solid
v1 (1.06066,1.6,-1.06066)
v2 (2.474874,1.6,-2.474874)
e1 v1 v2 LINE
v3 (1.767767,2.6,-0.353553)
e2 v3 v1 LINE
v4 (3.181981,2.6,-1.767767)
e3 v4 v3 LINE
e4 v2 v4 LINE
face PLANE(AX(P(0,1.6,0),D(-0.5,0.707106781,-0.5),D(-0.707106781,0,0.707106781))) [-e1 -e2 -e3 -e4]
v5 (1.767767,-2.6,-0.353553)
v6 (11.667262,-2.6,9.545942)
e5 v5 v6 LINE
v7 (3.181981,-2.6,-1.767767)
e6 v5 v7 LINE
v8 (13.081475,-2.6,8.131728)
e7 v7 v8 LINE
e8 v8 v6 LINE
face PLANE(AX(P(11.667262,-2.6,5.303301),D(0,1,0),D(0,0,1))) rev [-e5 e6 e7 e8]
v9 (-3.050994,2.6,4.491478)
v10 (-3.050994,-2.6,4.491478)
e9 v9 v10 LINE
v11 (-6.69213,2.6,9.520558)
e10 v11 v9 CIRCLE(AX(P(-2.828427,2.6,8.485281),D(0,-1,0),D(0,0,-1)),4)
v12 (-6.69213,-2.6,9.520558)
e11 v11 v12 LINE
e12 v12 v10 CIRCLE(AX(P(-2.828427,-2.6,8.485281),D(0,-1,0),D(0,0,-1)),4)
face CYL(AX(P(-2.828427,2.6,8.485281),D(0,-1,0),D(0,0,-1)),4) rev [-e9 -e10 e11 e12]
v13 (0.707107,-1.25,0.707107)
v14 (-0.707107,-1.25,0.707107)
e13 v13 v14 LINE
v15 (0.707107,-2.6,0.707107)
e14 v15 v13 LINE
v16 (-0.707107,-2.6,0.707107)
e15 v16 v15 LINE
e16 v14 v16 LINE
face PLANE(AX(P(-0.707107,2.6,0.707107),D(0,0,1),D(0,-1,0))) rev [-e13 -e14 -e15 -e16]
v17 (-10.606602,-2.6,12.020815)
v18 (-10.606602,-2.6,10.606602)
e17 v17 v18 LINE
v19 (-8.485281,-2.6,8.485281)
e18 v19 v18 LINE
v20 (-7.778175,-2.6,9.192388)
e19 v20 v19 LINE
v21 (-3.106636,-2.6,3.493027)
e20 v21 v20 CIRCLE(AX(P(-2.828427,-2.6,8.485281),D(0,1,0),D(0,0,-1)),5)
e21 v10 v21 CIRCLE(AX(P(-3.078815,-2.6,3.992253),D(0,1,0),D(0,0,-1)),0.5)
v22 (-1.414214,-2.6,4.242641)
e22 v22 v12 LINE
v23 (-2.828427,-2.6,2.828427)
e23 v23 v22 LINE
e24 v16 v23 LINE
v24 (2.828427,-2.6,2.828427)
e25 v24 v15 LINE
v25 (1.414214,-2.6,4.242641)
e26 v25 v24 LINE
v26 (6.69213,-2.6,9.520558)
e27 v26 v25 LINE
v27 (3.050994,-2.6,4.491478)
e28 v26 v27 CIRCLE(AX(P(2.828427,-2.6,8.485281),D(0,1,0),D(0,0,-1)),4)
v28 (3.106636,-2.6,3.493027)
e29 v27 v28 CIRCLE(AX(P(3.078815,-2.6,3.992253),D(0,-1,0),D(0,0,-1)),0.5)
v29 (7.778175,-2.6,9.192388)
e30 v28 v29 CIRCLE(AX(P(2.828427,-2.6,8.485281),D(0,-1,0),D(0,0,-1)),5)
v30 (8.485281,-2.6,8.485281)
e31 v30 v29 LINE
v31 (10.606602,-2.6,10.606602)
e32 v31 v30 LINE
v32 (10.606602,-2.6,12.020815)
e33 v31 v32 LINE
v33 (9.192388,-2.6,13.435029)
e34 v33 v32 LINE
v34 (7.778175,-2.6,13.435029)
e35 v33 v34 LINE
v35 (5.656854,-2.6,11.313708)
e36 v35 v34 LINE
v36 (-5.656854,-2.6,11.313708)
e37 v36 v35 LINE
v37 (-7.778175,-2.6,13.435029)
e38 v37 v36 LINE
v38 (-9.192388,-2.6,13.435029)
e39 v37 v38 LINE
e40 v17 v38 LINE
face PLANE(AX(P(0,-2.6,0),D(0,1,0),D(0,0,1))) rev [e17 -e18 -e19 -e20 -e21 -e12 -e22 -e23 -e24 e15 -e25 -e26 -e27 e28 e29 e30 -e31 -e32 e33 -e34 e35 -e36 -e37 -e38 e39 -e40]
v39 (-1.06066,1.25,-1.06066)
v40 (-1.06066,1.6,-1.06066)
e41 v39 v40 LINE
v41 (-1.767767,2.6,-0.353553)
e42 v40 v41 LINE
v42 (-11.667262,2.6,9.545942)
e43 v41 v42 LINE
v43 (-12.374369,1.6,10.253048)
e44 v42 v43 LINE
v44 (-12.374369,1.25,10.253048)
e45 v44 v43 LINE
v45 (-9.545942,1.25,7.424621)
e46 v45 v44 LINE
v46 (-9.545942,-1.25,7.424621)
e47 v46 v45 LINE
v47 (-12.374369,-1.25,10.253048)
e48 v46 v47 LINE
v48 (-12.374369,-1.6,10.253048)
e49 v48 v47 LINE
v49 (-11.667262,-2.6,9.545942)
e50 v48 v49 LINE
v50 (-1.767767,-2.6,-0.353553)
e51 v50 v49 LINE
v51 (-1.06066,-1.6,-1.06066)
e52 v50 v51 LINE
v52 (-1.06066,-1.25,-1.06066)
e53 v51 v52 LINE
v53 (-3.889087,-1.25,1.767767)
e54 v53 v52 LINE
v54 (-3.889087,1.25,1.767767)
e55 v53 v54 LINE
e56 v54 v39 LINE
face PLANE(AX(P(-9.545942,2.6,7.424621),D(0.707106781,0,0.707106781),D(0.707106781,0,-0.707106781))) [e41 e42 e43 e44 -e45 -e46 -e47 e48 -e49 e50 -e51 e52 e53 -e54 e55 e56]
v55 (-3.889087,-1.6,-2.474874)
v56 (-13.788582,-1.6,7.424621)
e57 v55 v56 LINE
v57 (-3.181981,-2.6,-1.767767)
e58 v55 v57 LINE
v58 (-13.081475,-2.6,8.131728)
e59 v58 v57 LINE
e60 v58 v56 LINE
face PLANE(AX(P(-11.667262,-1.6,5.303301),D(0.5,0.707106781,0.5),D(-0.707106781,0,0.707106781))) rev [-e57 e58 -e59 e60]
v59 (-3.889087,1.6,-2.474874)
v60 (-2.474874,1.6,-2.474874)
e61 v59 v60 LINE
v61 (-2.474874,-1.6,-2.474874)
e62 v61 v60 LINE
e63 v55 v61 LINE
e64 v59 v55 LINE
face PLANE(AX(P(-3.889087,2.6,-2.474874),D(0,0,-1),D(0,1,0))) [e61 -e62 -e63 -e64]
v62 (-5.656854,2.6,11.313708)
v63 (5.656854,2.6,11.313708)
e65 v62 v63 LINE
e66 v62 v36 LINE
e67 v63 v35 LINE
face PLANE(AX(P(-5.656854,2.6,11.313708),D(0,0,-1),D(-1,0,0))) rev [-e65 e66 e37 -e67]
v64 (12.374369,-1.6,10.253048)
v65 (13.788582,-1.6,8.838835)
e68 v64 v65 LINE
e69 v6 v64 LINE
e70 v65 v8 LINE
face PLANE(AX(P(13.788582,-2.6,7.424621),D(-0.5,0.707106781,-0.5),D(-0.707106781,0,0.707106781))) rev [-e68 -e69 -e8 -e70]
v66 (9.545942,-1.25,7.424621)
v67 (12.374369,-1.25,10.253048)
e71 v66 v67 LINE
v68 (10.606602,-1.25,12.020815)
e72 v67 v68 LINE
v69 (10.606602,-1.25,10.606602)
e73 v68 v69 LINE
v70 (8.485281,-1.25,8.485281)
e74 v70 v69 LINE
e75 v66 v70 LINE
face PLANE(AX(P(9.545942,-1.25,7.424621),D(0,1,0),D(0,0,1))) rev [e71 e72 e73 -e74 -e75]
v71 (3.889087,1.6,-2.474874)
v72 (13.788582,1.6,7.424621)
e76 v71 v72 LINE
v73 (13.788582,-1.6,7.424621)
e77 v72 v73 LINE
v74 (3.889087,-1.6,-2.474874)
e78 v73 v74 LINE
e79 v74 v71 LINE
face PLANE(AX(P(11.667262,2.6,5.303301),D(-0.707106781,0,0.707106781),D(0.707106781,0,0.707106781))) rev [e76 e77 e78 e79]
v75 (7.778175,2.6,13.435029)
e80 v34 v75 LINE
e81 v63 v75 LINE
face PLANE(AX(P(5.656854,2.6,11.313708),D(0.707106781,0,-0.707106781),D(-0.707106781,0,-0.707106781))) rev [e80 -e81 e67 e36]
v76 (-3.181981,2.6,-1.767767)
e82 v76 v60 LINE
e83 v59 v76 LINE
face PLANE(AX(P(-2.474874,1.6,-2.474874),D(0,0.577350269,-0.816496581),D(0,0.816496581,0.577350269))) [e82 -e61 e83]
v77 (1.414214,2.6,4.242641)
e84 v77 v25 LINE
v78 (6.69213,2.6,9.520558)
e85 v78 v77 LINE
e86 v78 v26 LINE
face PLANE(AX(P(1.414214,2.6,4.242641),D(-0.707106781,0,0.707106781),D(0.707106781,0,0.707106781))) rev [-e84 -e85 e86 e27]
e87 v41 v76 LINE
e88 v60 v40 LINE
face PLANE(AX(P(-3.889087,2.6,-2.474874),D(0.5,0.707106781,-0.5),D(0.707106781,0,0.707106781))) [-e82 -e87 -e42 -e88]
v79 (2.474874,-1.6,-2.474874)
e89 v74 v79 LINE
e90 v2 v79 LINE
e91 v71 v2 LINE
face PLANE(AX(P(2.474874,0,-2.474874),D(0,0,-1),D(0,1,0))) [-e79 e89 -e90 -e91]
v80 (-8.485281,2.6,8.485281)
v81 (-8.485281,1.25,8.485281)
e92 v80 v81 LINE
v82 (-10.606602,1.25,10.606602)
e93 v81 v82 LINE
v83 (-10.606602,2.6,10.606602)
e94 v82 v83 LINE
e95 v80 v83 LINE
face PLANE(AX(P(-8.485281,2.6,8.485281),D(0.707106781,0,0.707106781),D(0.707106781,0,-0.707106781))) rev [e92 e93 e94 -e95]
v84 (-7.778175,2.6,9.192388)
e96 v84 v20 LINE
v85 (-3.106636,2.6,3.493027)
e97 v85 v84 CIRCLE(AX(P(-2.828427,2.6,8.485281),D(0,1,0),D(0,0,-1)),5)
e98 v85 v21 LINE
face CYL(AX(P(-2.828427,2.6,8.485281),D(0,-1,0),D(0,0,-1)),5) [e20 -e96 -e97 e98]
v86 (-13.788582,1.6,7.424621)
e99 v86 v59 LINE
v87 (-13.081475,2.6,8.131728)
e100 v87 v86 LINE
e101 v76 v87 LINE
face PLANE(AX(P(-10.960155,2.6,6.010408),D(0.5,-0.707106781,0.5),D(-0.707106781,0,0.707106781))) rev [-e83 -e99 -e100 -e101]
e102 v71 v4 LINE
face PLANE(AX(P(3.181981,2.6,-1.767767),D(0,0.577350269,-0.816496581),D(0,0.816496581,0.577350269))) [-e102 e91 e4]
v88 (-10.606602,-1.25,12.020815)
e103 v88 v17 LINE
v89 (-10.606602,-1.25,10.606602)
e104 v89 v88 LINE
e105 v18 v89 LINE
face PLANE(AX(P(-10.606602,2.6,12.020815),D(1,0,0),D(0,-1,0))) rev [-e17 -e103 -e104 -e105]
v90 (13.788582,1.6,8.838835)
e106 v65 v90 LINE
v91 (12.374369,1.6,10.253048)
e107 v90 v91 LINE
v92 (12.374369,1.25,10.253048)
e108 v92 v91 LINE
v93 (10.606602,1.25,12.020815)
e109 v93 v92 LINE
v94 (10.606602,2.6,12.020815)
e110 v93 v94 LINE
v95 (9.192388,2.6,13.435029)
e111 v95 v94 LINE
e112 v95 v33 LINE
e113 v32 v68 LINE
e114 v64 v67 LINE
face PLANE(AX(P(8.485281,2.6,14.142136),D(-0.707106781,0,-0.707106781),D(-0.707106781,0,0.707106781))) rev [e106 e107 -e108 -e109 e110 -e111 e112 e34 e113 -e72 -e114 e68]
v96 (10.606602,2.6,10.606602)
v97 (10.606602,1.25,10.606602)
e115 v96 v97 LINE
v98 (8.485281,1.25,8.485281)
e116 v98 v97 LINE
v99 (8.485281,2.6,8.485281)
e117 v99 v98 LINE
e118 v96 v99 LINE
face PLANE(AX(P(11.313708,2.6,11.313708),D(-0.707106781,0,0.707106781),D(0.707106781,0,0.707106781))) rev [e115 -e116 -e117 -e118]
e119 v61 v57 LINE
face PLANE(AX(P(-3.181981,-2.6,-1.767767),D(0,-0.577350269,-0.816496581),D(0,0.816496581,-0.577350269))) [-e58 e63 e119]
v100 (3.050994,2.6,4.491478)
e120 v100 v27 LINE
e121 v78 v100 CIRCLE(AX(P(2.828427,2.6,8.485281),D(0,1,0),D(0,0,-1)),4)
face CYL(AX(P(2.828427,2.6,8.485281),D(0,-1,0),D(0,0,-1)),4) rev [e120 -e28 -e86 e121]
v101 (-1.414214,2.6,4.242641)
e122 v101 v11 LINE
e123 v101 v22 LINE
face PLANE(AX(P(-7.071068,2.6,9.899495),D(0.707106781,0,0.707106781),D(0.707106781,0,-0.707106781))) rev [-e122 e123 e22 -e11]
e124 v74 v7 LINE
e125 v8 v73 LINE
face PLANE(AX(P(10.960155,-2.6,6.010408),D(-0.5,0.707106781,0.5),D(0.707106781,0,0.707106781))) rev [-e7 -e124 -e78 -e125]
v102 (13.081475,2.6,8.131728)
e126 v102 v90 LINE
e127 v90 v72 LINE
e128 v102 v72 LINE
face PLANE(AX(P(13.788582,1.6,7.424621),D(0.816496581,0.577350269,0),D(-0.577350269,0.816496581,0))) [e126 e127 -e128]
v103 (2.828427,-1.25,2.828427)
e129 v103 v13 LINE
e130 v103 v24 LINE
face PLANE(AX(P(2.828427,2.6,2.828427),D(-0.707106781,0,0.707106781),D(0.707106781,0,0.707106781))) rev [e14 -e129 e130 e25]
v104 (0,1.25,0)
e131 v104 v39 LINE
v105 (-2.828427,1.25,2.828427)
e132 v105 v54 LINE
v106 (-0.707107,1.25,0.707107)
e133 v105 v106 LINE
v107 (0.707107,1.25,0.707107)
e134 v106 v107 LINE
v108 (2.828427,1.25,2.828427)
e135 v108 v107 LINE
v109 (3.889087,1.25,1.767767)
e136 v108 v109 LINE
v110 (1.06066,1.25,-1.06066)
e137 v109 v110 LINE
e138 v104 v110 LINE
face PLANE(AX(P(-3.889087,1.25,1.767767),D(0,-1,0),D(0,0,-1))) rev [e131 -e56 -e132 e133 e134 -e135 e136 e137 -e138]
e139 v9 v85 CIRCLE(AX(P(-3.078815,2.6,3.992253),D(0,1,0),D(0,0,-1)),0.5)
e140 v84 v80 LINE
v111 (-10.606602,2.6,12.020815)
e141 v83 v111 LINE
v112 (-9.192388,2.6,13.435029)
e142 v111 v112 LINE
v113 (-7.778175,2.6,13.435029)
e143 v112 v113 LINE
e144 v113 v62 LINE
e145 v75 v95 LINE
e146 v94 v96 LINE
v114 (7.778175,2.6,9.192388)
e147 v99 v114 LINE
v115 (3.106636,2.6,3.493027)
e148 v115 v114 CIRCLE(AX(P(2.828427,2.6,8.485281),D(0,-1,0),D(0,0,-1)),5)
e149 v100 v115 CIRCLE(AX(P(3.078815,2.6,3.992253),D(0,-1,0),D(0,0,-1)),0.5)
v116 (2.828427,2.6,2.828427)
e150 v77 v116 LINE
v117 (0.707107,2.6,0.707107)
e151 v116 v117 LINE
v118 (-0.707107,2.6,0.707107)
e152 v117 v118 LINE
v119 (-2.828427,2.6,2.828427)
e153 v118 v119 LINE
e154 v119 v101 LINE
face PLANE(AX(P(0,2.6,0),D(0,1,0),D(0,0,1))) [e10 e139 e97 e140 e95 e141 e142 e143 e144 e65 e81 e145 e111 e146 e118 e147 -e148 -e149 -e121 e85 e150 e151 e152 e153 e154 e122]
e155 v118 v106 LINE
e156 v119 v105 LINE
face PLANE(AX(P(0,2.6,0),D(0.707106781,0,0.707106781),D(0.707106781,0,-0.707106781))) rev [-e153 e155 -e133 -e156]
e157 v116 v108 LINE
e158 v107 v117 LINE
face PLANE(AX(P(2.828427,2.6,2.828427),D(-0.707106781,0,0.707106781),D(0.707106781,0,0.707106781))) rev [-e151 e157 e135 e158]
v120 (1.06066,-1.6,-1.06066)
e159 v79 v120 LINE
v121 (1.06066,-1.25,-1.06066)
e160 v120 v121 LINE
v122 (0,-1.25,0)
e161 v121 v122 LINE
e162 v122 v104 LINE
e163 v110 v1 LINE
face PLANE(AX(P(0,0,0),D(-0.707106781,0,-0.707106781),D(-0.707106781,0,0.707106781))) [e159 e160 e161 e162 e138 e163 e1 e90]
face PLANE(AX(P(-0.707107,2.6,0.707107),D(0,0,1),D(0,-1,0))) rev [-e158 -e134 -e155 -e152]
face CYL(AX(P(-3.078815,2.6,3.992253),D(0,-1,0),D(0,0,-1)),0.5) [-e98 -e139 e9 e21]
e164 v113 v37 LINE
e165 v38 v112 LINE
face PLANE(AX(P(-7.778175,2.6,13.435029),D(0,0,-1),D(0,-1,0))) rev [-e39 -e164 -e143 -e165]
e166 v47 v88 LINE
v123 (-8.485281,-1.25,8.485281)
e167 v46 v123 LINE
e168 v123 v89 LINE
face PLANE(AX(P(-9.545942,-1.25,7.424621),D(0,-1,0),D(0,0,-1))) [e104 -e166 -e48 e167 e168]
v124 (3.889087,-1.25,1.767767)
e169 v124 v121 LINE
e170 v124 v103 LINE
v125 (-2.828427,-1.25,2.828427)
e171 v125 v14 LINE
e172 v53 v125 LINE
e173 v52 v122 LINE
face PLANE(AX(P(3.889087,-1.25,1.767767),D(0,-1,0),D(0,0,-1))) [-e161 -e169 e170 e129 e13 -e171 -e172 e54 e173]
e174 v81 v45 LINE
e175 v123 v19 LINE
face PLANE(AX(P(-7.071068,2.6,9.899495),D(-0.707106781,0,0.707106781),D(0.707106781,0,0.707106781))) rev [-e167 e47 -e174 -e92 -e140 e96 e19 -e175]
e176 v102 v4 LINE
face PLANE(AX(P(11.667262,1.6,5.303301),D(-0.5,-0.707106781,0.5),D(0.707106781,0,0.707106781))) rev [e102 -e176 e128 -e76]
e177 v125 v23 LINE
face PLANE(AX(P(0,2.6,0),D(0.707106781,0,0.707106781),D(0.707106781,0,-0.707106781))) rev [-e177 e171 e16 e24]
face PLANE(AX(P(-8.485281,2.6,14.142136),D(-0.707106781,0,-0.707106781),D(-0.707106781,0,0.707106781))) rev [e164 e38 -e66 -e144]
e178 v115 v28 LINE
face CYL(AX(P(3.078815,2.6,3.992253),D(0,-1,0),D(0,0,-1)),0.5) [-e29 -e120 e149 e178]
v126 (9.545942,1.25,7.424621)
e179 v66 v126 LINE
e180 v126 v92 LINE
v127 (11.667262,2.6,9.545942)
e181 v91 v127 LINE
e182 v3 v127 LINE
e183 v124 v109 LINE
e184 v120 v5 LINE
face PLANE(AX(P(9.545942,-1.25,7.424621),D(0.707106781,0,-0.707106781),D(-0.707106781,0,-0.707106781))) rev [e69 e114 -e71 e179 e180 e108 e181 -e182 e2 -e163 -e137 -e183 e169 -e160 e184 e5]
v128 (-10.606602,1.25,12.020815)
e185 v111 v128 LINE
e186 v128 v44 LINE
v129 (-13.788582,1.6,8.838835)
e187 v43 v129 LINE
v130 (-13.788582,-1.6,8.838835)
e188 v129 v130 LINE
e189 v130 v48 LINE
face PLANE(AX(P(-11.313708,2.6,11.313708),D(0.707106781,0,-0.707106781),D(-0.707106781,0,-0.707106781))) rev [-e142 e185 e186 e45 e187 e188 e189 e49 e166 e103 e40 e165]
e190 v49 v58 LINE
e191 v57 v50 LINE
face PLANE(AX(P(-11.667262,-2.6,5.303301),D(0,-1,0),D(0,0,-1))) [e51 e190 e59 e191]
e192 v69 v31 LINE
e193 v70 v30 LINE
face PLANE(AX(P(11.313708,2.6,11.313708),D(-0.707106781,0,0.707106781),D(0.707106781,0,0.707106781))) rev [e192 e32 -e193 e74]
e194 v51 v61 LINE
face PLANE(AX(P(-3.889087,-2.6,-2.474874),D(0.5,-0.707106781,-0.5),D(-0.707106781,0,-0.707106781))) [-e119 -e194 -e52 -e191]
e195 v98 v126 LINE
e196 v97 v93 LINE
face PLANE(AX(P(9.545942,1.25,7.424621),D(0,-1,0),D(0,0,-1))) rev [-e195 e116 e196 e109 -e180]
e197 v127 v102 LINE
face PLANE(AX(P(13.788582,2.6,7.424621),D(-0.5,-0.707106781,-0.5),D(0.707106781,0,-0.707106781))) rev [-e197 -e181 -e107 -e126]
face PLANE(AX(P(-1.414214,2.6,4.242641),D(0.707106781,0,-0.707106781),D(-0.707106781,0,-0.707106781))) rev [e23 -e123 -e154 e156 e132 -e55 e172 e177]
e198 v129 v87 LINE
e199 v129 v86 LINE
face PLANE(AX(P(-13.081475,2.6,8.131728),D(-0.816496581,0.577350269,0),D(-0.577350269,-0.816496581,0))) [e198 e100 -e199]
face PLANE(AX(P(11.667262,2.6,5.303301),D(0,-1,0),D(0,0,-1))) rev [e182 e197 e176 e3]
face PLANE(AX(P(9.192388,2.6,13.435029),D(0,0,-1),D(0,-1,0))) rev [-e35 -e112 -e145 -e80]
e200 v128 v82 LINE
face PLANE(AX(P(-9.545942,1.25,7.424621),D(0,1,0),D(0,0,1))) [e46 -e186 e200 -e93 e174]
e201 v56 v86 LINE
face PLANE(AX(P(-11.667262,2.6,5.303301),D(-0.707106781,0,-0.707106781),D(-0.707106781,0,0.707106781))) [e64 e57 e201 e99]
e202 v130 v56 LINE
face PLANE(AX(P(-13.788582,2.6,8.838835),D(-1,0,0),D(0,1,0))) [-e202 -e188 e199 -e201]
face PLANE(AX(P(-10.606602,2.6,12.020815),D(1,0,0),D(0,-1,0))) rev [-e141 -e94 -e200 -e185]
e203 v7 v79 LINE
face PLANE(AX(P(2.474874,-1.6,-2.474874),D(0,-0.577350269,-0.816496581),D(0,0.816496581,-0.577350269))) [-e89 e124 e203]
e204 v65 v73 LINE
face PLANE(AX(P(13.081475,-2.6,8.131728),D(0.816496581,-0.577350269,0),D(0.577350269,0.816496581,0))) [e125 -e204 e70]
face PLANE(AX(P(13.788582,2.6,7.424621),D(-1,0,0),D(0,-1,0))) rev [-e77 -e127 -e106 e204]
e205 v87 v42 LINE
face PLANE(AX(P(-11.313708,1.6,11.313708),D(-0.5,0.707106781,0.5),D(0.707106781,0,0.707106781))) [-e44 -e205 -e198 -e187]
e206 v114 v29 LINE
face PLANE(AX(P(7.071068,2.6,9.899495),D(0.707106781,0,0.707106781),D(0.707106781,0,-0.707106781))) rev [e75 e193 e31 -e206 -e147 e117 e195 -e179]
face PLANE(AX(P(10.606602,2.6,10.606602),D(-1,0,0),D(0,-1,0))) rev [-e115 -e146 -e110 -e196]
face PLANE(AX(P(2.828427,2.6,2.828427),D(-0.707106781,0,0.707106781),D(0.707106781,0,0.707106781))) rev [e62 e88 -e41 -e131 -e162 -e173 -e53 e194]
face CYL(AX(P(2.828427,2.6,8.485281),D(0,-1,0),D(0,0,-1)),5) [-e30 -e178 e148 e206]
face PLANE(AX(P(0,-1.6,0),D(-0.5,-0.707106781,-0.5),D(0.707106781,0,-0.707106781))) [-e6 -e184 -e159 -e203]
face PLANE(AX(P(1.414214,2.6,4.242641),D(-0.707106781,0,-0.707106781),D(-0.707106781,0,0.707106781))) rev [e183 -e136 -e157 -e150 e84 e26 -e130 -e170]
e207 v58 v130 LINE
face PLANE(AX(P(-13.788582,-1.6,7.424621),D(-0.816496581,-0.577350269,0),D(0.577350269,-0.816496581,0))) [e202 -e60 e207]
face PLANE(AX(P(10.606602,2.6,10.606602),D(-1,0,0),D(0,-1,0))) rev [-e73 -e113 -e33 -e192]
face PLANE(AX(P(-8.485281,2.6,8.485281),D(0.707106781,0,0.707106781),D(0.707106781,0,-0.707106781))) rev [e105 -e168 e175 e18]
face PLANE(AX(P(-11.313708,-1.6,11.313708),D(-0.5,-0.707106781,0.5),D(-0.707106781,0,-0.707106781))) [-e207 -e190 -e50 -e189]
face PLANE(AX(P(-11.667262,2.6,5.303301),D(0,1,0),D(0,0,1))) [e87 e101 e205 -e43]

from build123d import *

# Parameters (mm, degrees)
BOSS_EXTRUDE1_DEPTH      = 2.6
BOSS_EXTRUDE2_DEPTH      = 4
SKETCH3_W                = 3
SKETCH3_H                = 5.2
BOSS_EXTRUDE3_DEPTH      = 8
BOSS_EXTRUDE4_DEPTH      = 2.6
CHAMFER1_SIZE            = 1
MIRROR2_COPY_1_DEPTH     = 4
CHAMFER1_OF_MIRROR2_SIZE = 1
CHAMFER2_SIZE            = 1


with BuildPart() as part:
    # Sketch1 → Boss-Extrude1 (new, symmetric)
    with BuildSketch(Plane(origin=(0, 0, 0), x_dir=(1, 0, 0), z_dir=(0, 1, 0))):
        Polygon((0, 0), (-2.828427125, -2.828427125), (-1.414213562, -4.242640687), (-7.071067812, -9.899494937), (-8.485281374, -8.485281374), (-11.313708499, -11.313708499), (-8.485281374, -14.142135624), (-5.656854249, -11.313708499), (5.656854249, -11.313708499), (8.485281374, -14.142135624), (11.313708499, -11.313708499), (8.485281374, -8.485281374), (7.071067812, -9.899494937), (1.414213562, -4.242640687), (2.828427125, -2.828427125), align=None)
    extrude(amount=BOSS_EXTRUDE1_DEPTH, both=True)

    # Sketch2 → Boss-Extrude2 (add)
    with BuildSketch(Plane(origin=(-11.313708499, 0, 11.313708499), x_dir=(0.7071067811865501, 0, 0.7071067811865449), z_dir=(-0.7071067811865449, 0, 0.7071067811865501))):
        Polygon((-1.5, -1.25), (-1.5, -2.6), (-4.5, -2.6), (-4.5, 2.6), (-1.5, 2.6), (-1.5, 1.25), (0, 1.25), (0, -1.25), align=None)
    boss_extrude2 = extrude(amount=-BOSS_EXTRUDE2_DEPTH)

    # Mirror1: Boss-Extrude2 across plane
    add(boss_extrude2.mirror(Plane(origin=(-5.656854249, 0, 5.656854249), x_dir=(0.707106781186549, 0, 0.707106781186546), z_dir=(-0.707106781186546, 0, 0.707106781186549))))

    # Sketch3 → Boss-Extrude3 (add)
    with BuildSketch(Plane(origin=(-2.828427125, 0, 2.828427125), x_dir=(0.7071067811865493, 0, 0.7071067811865457), z_dir=(-0.7071067811865457, 0, 0.7071067811865493))):
        with Locations((-3, 0)):
            Rectangle(SKETCH3_W, SKETCH3_H)
    boss_extrude3 = extrude(amount=BOSS_EXTRUDE3_DEPTH)

    # Sketch4 → Boss-Extrude4 (add, symmetric)
    with BuildSketch(Plane(origin=(0, 0, 0), x_dir=(1, 0, 0), z_dir=(0, 1, 0))):
        with BuildLine():
            Line((-7.778174593, -9.192388155), (-7.071067812, -9.899494937))
            Line((-7.071067812, -9.899494937), (-6.69213043, -9.520557555))
            ThreePointArc((-6.69213043, -9.520557555), (-6.068382545, -6.139500295), (-3.050994148, -4.491478184))
            ThreePointArc((-3.050994148, -4.491478184), (-2.579589628, -3.964431908), (-3.106635904, -3.493027387))
            ThreePointArc((-3.106635904, -3.493027387), (-6.695410435, -5.315669399), (-7.778174593, -9.192388155))
        make_face()
    boss_extrude4 = extrude(amount=BOSS_EXTRUDE4_DEPTH, both=True)

    # Chamfer1
    chamfer1_edges = [part.edges().sort_by_distance(p)[0] for p in [
        (-8.838834765, -2.6, 2.474873734),
        (-8.838834765, 2.6, 2.474873734),
        (-14.495689014, 0, 8.131727984),
        (-13.435028843, -2.6, 9.192388155),
        (-13.435028843, 2.6, 9.192388155),
        (-3.181980515, 0, -3.181980515),
        (-2.121320344, -2.6, -2.121320344),
        (-2.121320344, 2.6, -2.121320344),
    ]]
    chamfer(chamfer1_edges, length=CHAMFER1_SIZE)

    # Mirror2: Boss-Extrude2, Boss-Extrude3, Boss-Extrude4 across plane
    add(boss_extrude2.mirror(Plane(origin=(0, 0, 0), x_dir=(0, 0, 1), z_dir=(1, 0, 0))))
    add(boss_extrude3.mirror(Plane(origin=(0, 0, 0), x_dir=(0, 0, 1), z_dir=(1, 0, 0))))
    add(boss_extrude4.mirror(Plane(origin=(0, 0, 0), x_dir=(0, 0, 1), z_dir=(1, 0, 0))))

    # Mirror2 copy 1 sketch → Mirror2 copy 1 (add)
    with BuildSketch(Plane(origin=(0, 0, 0), x_dir=(-0.7071067811865479, 0, 0.7071067811865471), z_dir=(-0.7071067811865471, 0, -0.7071067811865479))):
        Polygon((-1.5, -1.25), (-1.5, -2.6), (-4.5, -2.6), (-4.5, 2.6), (-1.5, 2.6), (-1.5, 1.25), (0, 1.25), (0, -1.25), align=None)
    extrude(amount=-MIRROR2_COPY_1_DEPTH)

    # Chamfer1 of Mirror2
    chamfer1_of_mirror2_edges = [part.edges().sort_by_distance(p)[0] for p in [
        (8.838834765, -2.6, 2.474873734),
        (8.838834765, 2.6, 2.474873734),
        (14.495689014, 0, 8.131727984),
        (13.435028843, -2.6, 9.192388155),
        (13.435028843, 2.6, 9.192388155),
        (3.181980515, 0, -3.181980515),
        (2.121320344, -2.6, -2.121320344),
        (2.121320344, 2.6, -2.121320344),
    ]]
    chamfer(chamfer1_of_mirror2_edges, length=CHAMFER1_OF_MIRROR2_SIZE)

    # Chamfer2
    # the kernel refuses this chamfer: 1 mm, written as the material it takes off along each edge
    with BuildSketch(Plane(origin=(11.313708499, -5.171682988, 11.313708499), x_dir=(-0.6873969152646685, 0, 0.7262819568766788), z_dir=(0, 1, 0)), Plane(origin=(11.313708499, 1.25, 11.313708499), x_dir=(-0.6873969152646685, 0, 0.7262819568766788), z_dir=(0, 1, 0)), Plane(origin=(0, 5.171682988, 0), x_dir=(-0.7262819568766743, 0, 0.6873969152646733), z_dir=(0, -1, 0)), Plane(origin=(-11.313708499, -5.171682988, 11.313708499), x_dir=(0.6873969152646597, 0, -0.7262819568766873), z_dir=(0, 1, 0)), Plane(origin=(0, -1.25, 0), x_dir=(-0.7262819568766743, 0, 0.6873969152646733), z_dir=(0, -1, 0))) as chamfer2_piece_1:
        Polygon((CHAMFER2_SIZE * 0.999621916911, -CHAMFER2_SIZE * 0.0274958766106), (-CHAMFER2_SIZE * 0.0274958766106, -CHAMFER2_SIZE * 0.999621916911), (0, 0), align=None)
    extrude(amount=3.921682988, mode=Mode.SUBTRACT)
    with BuildSketch(Plane(origin=(11.313708499, -5.171682988, 11.313708499), x_dir=(-0.6873969152646685, 0, 0.7262819568766788), z_dir=(0, 1, 0))) as chamfer2_piece_2_section:
        Polygon((CHAMFER2_SIZE * 0.999621916911, -CHAMFER2_SIZE * 0.0274958766106), (-CHAMFER2_SIZE * 0.0274958766106, -CHAMFER2_SIZE * 0.999621916911), (0, 0), align=None)
    chamfer2_piece_2 = extrude(amount=6.493365976, mode=Mode.PRIVATE)
    chamfer2_piece_2 = split(chamfer2_piece_2, bisect_by=Plane(origin=(10.847309879, 1.25, 11.313708499), z_dir=(0, 1, 0)), keep=Keep.TOP, mode=Mode.PRIVATE)
    add(chamfer2_piece_2, mode=Mode.SUBTRACT)
    with BuildSketch(Plane(origin=(11.313708499, -1.321682988, 11.313708499), x_dir=(-0.6873969152646685, 0, 0.7262819568766788), z_dir=(0, 1, 0))) as chamfer2_piece_3_section:
        Polygon((CHAMFER2_SIZE * 0.999621916911, -CHAMFER2_SIZE * 0.0274958766106), (-CHAMFER2_SIZE * 0.0274958766106, -CHAMFER2_SIZE * 0.999621916911), (0, 0), align=None)
    chamfer2_piece_3 = extrude(amount=6.493365976, mode=Mode.PRIVATE)
    chamfer2_piece_3 = split(chamfer2_piece_3, bisect_by=Plane(origin=(10.847309879, -1.25, 11.313708499), z_dir=(0, -1, 0)), keep=Keep.TOP, mode=Mode.PRIVATE)
    add(chamfer2_piece_3, mode=Mode.SUBTRACT)
    with BuildSketch(Plane(origin=(8.485281374, -5.171682988, 14.142135624), x_dir=(0.7262819568766956, 0, -0.6873969152646507), z_dir=(0, 1, 0))) as chamfer2_piece_4:
        Polygon((CHAMFER2_SIZE * 0.999621916911, CHAMFER2_SIZE * 0.0274958766106), (-CHAMFER2_SIZE * 0.0274958766106, CHAMFER2_SIZE * 0.999621916911), (0, 0), align=None)
    extrude(amount=10.343365976, mode=Mode.SUBTRACT)
    with BuildSketch(Plane(origin=(-8.485281374, -5.171682988, 14.142135624), x_dir=(-0.7262819568766898, 0, -0.687396915264657), z_dir=(0, 1, 0))) as chamfer2_piece_5:
        Polygon((CHAMFER2_SIZE * 0.999621916911, -CHAMFER2_SIZE * 0.0274958766106), (-CHAMFER2_SIZE * 0.0274958766106, -CHAMFER2_SIZE * 0.999621916911), (0, 0), align=None)
    extrude(amount=10.343365976, mode=Mode.SUBTRACT)
    with BuildSketch(Plane(origin=(-11.313708499, -1.321682988, 11.313708499), x_dir=(0.6873969152646623, 0, 0.7262819568766848), z_dir=(0, 1, 0))) as chamfer2_piece_6_section:
        Polygon((CHAMFER2_SIZE * 0.999621916911, CHAMFER2_SIZE * 0.0274958766106), (-CHAMFER2_SIZE * 0.0274958766106, CHAMFER2_SIZE * 0.999621916911), (0, 0), align=None)
    chamfer2_piece_6 = extrude(amount=6.493365976, mode=Mode.PRIVATE)
    chamfer2_piece_6 = split(chamfer2_piece_6, bisect_by=Plane(origin=(-10.847309879, -1.25, 11.313708499), z_dir=(0, -1, 0)), keep=Keep.TOP, mode=Mode.PRIVATE)
    add(chamfer2_piece_6, mode=Mode.SUBTRACT)
    with BuildSketch(Plane(origin=(-11.313708499, 1.25, 11.313708499), x_dir=(0.6873969152646623, 0, 0.7262819568766848), z_dir=(0, 1, 0))) as chamfer2_piece_7:
        Polygon((CHAMFER2_SIZE * 0.999621916911, CHAMFER2_SIZE * 0.0274958766106), (-CHAMFER2_SIZE * 0.0274958766106, CHAMFER2_SIZE * 0.999621916911), (0, 0), align=None)
    extrude(amount=3.921682988, mode=Mode.SUBTRACT)
    with BuildSketch(Plane(origin=(0, 5.171682988, 0), x_dir=(-0.7262819568766743, 0, 0.6873969152646733), z_dir=(0, -1, 0))) as chamfer2_piece_8_section:
        Polygon((CHAMFER2_SIZE * 0.999621916911, -CHAMFER2_SIZE * 0.0274958766106), (-CHAMFER2_SIZE * 0.0274958766106, -CHAMFER2_SIZE * 0.999621916911), (0, 0), align=None)
    chamfer2_piece_8 = extrude(amount=6.493365976, mode=Mode.PRIVATE)
    chamfer2_piece_8 = split(chamfer2_piece_8, bisect_by=Plane(origin=(0, -1.25, 0.46639862), z_dir=(0, -1, 0)), keep=Keep.TOP, mode=Mode.PRIVATE)
    add(chamfer2_piece_8, mode=Mode.SUBTRACT)
    with BuildSketch(Plane(origin=(-11.313708499, -5.171682988, 11.313708499), x_dir=(0.6873969152646597, 0, -0.7262819568766873), z_dir=(0, 1, 0))) as chamfer2_piece_9_section:
        Polygon((CHAMFER2_SIZE * 0.999621916911, -CHAMFER2_SIZE * 0.0274958766106), (-CHAMFER2_SIZE * 0.0274958766106, -CHAMFER2_SIZE * 0.999621916911), (0, 0), align=None)
    chamfer2_piece_9 = extrude(amount=6.493365976, mode=Mode.PRIVATE)
    chamfer2_piece_9 = split(chamfer2_piece_9, bisect_by=Plane(origin=(-10.847309879, 1.25, 11.313708499), z_dir=(0, 1, 0)), keep=Keep.TOP, mode=Mode.PRIVATE)
    add(chamfer2_piece_9, mode=Mode.SUBTRACT)
    with BuildSketch(Plane(origin=(0, 1.321682988, 0), x_dir=(-0.7262819568766743, 0, 0.6873969152646733), z_dir=(0, -1, 0))) as chamfer2_piece_10_section:
        Polygon((CHAMFER2_SIZE * 0.999621916911, -CHAMFER2_SIZE * 0.0274958766106), (-CHAMFER2_SIZE * 0.0274958766106, -CHAMFER2_SIZE * 0.999621916911), (0, 0), align=None)
    chamfer2_piece_10 = extrude(amount=6.493365976, mode=Mode.PRIVATE)
    chamfer2_piece_10 = split(chamfer2_piece_10, bisect_by=Plane(origin=(0, 1.25, 0.46639862), z_dir=(0, 1, 0)), keep=Keep.TOP, mode=Mode.PRIVATE)
    add(chamfer2_piece_10, mode=Mode.SUBTRACT)


solid = part.part
